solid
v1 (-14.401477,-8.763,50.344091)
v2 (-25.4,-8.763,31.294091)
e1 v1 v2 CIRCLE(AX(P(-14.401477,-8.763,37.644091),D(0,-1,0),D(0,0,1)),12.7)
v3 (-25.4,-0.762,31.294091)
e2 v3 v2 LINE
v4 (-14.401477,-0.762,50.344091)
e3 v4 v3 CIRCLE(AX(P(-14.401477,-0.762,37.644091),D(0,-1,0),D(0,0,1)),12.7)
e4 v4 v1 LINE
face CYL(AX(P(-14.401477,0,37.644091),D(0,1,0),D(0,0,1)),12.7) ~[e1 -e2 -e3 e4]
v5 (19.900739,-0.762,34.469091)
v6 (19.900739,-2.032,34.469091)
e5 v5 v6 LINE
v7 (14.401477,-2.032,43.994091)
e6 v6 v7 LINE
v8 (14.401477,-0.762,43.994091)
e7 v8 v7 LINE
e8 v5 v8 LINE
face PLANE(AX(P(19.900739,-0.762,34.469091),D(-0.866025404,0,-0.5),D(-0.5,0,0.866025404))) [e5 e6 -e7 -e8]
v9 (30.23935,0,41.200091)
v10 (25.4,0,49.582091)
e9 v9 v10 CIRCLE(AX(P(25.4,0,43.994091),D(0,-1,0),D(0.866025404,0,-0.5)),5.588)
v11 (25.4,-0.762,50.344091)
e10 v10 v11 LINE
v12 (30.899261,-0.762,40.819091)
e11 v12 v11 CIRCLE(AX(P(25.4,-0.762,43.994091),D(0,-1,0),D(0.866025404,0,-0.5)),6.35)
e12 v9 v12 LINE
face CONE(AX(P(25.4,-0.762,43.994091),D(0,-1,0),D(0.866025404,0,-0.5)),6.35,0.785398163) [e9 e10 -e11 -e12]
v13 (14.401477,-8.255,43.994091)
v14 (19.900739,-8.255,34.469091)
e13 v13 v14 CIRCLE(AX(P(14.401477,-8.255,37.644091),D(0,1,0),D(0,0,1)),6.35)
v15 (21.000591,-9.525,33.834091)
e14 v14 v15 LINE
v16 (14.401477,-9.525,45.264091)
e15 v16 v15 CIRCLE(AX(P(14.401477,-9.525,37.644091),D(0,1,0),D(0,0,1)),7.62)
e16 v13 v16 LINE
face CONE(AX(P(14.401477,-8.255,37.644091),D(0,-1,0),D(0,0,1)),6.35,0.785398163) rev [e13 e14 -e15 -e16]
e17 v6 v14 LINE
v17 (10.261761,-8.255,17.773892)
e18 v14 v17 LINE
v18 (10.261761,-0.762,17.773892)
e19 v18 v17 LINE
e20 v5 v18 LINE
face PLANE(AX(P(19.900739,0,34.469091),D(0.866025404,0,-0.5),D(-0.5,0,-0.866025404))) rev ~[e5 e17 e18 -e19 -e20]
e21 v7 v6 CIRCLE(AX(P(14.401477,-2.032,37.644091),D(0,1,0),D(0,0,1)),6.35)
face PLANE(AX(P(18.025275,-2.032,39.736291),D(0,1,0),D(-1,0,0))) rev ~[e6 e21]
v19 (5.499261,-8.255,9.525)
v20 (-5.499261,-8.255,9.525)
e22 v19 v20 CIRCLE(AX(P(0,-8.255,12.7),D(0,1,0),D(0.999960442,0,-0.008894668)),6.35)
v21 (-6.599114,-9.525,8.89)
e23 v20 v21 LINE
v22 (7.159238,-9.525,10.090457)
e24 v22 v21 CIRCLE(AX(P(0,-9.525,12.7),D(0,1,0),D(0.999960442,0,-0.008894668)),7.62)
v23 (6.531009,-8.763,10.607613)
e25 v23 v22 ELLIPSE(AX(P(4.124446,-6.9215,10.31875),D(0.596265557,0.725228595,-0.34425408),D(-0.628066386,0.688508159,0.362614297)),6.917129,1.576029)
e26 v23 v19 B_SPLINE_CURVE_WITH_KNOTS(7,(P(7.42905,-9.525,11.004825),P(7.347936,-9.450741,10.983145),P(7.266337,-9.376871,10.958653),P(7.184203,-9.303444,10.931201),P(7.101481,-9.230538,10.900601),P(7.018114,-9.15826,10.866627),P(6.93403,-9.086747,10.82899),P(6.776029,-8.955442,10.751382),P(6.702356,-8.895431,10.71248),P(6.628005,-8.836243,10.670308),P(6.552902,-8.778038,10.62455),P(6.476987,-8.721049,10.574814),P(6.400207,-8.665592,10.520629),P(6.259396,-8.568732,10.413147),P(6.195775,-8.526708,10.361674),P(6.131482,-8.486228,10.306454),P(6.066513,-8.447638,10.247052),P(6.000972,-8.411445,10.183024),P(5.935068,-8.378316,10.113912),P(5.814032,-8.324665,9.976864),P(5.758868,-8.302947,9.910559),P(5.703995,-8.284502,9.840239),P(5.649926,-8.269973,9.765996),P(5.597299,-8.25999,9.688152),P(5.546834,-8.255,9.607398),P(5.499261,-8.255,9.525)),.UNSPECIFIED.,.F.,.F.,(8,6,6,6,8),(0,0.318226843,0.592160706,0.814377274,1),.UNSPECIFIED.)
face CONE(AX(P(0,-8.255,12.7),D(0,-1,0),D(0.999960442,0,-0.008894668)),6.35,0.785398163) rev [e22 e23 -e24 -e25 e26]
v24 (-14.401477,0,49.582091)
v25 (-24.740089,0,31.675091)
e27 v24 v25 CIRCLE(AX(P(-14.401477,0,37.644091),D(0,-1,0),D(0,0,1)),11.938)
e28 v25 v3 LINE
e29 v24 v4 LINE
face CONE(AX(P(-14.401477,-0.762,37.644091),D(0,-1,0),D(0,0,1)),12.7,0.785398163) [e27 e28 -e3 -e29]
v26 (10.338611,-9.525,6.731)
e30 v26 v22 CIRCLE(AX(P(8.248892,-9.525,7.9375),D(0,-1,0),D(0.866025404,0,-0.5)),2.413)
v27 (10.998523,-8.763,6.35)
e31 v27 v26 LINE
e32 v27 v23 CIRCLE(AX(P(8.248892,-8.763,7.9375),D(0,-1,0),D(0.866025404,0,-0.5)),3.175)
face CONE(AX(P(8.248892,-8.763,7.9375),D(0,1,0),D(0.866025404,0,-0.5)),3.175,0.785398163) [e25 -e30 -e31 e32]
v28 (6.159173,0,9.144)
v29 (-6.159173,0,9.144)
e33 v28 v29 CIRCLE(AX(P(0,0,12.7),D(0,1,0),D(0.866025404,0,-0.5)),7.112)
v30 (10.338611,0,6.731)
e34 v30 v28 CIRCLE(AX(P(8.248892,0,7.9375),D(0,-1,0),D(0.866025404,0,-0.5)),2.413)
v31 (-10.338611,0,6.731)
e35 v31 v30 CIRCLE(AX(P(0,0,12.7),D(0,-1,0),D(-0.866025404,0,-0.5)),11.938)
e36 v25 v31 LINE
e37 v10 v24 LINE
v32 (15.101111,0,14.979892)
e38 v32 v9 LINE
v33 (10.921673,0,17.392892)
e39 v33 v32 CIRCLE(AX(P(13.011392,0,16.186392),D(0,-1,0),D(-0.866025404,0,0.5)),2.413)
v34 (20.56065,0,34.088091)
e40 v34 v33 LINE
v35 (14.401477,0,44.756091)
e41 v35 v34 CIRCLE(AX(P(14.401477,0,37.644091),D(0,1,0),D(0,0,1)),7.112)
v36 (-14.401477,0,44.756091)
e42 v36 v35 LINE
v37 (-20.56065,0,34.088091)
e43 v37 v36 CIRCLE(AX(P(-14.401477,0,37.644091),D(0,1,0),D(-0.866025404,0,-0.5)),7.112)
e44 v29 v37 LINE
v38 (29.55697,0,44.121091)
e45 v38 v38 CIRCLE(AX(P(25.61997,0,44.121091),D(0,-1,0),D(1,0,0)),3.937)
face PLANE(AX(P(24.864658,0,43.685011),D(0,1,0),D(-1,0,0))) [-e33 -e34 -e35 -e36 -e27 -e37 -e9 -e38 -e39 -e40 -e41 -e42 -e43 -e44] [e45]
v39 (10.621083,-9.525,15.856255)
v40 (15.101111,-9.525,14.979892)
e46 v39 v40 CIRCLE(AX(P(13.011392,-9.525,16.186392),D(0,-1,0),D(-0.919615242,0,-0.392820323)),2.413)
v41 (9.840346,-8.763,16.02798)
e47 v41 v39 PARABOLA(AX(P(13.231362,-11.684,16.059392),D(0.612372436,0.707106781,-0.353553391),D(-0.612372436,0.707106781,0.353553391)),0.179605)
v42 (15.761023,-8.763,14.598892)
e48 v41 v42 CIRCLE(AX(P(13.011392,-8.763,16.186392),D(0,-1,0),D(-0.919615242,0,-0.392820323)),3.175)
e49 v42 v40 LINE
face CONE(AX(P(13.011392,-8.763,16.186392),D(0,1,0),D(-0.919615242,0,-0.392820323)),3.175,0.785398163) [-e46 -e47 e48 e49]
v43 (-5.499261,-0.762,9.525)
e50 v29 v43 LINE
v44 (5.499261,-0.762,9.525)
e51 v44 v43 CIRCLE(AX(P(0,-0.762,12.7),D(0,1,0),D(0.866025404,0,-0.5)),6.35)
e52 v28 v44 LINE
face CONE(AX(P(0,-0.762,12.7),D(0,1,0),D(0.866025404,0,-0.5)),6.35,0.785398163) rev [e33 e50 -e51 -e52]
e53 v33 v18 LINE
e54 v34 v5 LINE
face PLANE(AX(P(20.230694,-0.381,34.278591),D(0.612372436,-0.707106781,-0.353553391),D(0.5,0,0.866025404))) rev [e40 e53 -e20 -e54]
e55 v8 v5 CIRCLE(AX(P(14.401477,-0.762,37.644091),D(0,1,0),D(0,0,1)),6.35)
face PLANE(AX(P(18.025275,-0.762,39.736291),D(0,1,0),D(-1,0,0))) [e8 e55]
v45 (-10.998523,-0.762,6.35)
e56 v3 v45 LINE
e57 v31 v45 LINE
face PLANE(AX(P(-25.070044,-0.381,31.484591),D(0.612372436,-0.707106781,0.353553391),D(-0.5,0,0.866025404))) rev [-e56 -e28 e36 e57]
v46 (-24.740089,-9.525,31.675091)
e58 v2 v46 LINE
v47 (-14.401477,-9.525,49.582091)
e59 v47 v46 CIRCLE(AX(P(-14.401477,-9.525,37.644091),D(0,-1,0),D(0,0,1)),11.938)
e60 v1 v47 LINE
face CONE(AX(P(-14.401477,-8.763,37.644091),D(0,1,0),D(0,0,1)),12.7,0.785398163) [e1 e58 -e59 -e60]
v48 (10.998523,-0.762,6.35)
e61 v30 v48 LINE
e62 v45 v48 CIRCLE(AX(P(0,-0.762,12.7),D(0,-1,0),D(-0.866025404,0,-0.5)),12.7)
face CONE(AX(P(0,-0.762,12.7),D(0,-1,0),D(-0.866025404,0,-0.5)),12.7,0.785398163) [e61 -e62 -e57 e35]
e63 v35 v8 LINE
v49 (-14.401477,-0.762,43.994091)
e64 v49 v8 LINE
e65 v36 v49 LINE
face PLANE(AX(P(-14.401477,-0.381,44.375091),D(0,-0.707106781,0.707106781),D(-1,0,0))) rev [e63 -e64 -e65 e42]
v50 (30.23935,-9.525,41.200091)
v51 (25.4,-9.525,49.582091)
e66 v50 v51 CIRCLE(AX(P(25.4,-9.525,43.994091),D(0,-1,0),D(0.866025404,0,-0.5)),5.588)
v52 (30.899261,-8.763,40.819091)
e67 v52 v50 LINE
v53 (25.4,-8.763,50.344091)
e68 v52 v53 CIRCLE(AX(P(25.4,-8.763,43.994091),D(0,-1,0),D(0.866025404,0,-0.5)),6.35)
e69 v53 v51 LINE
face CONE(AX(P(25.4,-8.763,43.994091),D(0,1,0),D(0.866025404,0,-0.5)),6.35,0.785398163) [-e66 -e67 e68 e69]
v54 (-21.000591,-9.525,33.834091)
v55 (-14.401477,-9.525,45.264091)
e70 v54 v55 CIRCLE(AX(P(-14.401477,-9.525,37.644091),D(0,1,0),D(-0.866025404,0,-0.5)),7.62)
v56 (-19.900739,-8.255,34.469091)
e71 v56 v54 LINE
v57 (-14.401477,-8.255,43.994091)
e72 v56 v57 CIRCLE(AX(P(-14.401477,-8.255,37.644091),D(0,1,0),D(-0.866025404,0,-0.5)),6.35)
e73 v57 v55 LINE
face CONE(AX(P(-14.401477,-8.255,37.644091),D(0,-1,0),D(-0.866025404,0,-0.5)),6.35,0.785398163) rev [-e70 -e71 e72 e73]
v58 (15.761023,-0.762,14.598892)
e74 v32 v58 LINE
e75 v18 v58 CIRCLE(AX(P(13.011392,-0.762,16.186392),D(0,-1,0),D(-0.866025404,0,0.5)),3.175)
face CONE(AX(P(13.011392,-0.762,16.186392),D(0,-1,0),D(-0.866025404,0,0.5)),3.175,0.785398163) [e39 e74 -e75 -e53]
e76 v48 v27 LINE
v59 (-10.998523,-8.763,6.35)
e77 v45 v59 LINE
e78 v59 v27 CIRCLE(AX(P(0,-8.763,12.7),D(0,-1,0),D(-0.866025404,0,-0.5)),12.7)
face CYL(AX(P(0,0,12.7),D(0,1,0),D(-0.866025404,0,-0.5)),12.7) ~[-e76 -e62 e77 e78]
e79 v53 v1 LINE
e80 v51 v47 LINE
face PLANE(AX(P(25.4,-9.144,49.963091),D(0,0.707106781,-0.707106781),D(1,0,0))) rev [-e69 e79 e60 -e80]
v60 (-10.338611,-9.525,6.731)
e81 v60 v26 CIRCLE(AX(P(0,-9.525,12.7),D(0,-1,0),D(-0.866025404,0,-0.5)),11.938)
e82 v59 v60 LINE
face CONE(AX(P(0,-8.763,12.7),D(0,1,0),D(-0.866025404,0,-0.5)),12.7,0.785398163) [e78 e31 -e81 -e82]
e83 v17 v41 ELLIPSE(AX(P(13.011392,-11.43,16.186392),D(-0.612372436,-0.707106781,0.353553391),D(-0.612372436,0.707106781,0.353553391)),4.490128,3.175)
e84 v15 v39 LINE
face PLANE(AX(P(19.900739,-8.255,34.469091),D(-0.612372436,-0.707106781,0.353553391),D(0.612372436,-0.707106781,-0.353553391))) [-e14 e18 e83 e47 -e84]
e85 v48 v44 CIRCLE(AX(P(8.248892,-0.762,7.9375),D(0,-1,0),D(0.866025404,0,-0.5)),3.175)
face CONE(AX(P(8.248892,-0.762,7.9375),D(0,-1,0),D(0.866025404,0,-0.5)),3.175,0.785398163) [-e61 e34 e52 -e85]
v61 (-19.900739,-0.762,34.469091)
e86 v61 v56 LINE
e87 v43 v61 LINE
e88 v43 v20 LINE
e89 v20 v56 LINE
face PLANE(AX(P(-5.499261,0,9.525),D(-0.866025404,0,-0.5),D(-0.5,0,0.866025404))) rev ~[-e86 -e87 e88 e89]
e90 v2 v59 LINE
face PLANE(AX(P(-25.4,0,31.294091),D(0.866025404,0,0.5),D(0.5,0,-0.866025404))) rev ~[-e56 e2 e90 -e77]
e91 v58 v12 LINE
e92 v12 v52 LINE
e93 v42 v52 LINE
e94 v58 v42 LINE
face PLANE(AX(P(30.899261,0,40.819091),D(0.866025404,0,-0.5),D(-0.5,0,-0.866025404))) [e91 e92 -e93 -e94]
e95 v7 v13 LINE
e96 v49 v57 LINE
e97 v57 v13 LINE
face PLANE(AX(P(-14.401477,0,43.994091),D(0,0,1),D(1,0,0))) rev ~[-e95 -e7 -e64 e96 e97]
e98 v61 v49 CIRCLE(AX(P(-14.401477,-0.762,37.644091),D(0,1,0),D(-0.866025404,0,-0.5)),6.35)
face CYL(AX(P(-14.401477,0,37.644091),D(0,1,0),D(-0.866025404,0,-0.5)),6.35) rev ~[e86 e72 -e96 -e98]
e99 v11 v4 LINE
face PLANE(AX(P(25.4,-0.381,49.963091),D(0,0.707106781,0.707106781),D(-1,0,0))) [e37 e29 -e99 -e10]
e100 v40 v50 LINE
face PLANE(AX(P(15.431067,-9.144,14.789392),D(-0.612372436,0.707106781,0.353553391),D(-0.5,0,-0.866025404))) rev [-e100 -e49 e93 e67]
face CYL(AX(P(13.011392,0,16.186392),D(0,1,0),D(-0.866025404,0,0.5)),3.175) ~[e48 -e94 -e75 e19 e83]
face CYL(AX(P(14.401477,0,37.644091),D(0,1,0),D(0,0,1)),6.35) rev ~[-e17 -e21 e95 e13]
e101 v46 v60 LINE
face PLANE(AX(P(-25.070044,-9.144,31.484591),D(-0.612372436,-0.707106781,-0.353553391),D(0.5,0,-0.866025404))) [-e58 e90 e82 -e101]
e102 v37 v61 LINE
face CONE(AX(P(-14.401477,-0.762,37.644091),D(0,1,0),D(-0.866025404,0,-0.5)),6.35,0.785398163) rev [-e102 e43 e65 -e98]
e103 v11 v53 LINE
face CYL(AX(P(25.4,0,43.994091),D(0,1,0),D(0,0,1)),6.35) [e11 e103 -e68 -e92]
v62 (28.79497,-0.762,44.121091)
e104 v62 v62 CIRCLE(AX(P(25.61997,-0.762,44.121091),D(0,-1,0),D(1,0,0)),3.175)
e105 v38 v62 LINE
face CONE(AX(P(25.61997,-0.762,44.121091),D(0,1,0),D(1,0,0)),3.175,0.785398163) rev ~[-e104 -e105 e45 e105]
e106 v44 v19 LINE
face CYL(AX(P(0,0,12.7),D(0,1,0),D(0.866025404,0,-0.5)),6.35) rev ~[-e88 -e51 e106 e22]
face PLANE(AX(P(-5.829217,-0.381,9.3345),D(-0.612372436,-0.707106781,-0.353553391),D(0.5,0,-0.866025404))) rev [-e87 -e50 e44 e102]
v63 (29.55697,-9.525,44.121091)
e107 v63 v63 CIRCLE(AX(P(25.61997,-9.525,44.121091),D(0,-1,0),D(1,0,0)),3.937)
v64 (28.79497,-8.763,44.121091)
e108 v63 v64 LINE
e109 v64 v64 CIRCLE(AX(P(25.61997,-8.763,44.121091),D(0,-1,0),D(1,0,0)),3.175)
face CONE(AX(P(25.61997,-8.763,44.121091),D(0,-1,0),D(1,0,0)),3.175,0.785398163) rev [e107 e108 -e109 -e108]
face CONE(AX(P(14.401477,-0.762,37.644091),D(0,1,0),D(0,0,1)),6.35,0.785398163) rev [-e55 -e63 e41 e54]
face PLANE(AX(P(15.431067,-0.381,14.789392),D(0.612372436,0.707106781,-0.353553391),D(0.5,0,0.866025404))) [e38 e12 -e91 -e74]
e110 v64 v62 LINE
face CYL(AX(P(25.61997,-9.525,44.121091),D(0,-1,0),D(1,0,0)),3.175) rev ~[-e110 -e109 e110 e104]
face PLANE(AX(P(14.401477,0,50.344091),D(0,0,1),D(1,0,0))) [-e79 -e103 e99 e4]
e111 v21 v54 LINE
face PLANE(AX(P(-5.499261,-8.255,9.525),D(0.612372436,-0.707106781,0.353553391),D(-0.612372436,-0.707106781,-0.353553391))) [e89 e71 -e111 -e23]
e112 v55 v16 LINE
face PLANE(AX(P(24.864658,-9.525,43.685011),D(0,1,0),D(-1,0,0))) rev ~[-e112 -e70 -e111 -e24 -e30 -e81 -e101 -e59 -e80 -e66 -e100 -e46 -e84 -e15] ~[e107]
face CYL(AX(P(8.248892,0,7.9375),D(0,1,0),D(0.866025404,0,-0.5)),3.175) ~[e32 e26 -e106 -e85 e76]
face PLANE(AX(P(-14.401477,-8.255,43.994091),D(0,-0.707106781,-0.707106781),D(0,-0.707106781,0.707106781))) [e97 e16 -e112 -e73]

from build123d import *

# Parameters (mm, degrees)
F1_DEPTH     = 9.525
F3_T1_DEPTH  = 28.8029547439
F3_T3_DEPTH  = 22.5439921386
F3_T5_DEPTH  = 28.8029547439
F3_T8_ANGLE  = 120
F3_T10_ANGLE = 120
F3_T12_ANGLE = 149.490366343
F5_DEPTH     = 9.525
F6_SIZE      = 0.762
F8_R         = 3.175
F9_DEPTH     = 9.526
F10_SIZE     = 0.762
F12_DEPTH    = 1.27


# Not quite as in the source:
# - a fillet or chamfer that OpenCascade refuses, or shapes differently, is made with other operations: its cross-section is extruded or revolved along the edge and cut away or added
# - a feature of the source that left no trace in its solid (it failed there, or was rolled back) is left out
# - a feature names something its author has since deleted; it is built from what else it names


with BuildPart() as f1:
    # F0 (on Front) → F1 (new body)
    with BuildSketch(Plane.XZ):
        with BuildLine():
            Line((-14.4014773719, 43.9940905122), (14.4014773719, 43.9940905122))
            ThreePointArc((14.4014773719, 43.9940905122), (19.900738686, 40.8190905122), (19.900738686, 34.4690905122))
            Line((19.900738686, 34.4690905122), (10.261761314, 17.773891971))
            ThreePointArc((10.261761314, 17.773891971), (11.423891971, 13.436761314), (15.7610226281, 14.598891971))
            Line((15.7610226281, 14.598891971), (25.4, 31.2940905122))
            ThreePointArc((25.4, 31.2940905122), (25.4, 43.9940905122), (14.4014773719, 50.3440905122))
            Line((14.4014773719, 50.3440905122), (-14.4014773719, 50.3440905122))
            ThreePointArc((-14.4014773719, 50.3440905122), (-25.4, 43.9940905122), (-25.4, 31.2940905122))
            Line((-25.4, 31.2940905122), (-10.9985226281, 6.35))
            ThreePointArc((-10.9985226281, 6.35), (0, 0), (10.9985226281, 6.35))
            ThreePointArc((10.9985226281, 6.35), (9.836391971, 10.687130657), (5.499261314, 9.525))
            ThreePointArc((5.499261314, 9.525), (0, 6.35), (-5.499261314, 9.525))
            Line((-5.499261314, 9.525), (-19.900738686, 34.4690905122))
            ThreePointArc((-19.900738686, 34.4690905122), (-19.900738686, 40.8190905122), (-14.4014773719, 43.9940905122))
        make_face()
    extrude(amount=F1_DEPTH)

    # F3: chamfer of 1.27 on 6 edges, made by hand

    # F3_s2 → F3_t1 (cut)
    with BuildSketch(Plane.YZ.offset(-14.4014773719)):
        Polygon((-8.255, 43.9940905122), (-9.525, 45.2640905122), (-9.525, 43.9940905122), align=None)
    extrude(amount=F3_T1_DEPTH, mode=Mode.SUBTRACT)

    # F3_s4 → F3_t3 (cut)
    with BuildSketch(Plane(origin=(19.900738686, 0, 34.4690905122), x_dir=(0, 1, 0), z_dir=(-0.5, 0, -0.8660254038))):
        Polygon((-8.255, 0), (-9.525, 1.27), (-9.525, 0), align=None)
    extrude(amount=F3_T3_DEPTH, mode=Mode.SUBTRACT)

    # F3_s6 → F3_t5 (cut)
    with BuildSketch(Plane(origin=(-5.499261314, 0, 9.525), x_dir=(0, 1, 0), z_dir=(-0.5, 0, 0.8660254038))):
        Polygon((-8.255, 0), (-9.525, 1.27), (-9.525, 0), align=None)
    extrude(amount=F3_T5_DEPTH, mode=Mode.SUBTRACT)

    # F3_s7 → F3_t8 (revolve, cut)
    with BuildSketch(Plane(origin=(-19.900738686, 0, 34.4690905122), x_dir=(0, 1, 0), z_dir=(0.5, 0, -0.8660254038))):
        Polygon((-8.255, 0), (-9.525, -1.27), (-9.525, 0), align=None)
    revolve(axis=Axis((-14.4014773719, -9.525, 37.6440905122), (0, 1, 0)), revolution_arc=F3_T8_ANGLE, mode=Mode.SUBTRACT)

    # F3_s9 → F3_t10 (revolve, cut)
    with BuildSketch(Plane.YZ.offset(14.4014773719)):
        Polygon((-8.255, 43.9940905122), (-9.525, 45.2640905122), (-9.525, 43.9940905122), align=None)
    revolve(axis=Axis((14.4014773719, -9.525, 37.6440905122), (0, 1, 0)), revolution_arc=F3_T10_ANGLE, mode=Mode.SUBTRACT)

    # F3_s11 → F3_t12 (revolve, cut)
    with BuildSketch(Plane(origin=(0.1129578151, 0, 12.698995238), x_dir=(0, 1, 0), z_dir=(0.008894668, 0, 0.9999604417))):
        Polygon((-8.255, -6.2370377163), (-9.525, -7.5070377163), (-9.525, -6.2370377163), align=None)
    revolve(axis=Axis((0, -9.525, 12.7), (0, 1, 0)), revolution_arc=F3_T12_ANGLE, mode=Mode.SUBTRACT)

    # F4 (on face) → F5 (join, through all)
    with BuildSketch(Plane(origin=(0, 0, 0), x_dir=(-1, 0, 0), z_dir=(0, 1, 0))):
        with BuildLine():
            Line((-30.899261314, 40.8190905122), (-25.4, 31.2940905122))
            ThreePointArc((-25.4, 31.2940905122), (-25.4, 43.9940905122), (-14.4014773719, 50.3440905122))
            Line((-14.4014773719, 50.3440905122), (-25.4, 50.3440905122))
            ThreePointArc((-25.4, 50.3440905122), (-30.899261314, 47.1690905122), (-30.899261314, 40.8190905122))
        make_face()
    extrude(amount=-F5_DEPTH)

    # F6
    f6_edges = [f1.edges().sort_by_distance(p)[0] for p in [
        (12.821161, -9.525, 13.017096),
        (23.330142, -9.525, 27.708991),
        (30.899261, -9.525, 47.169091),
        (5.499261, -9.525, 50.344091),
        (-25.4, -9.525, 43.994091),
        (-18.199261, -9.525, 18.822045),
        (0, -9.525, 0),
        (10.76839, -9.525, 9.869534),
        (9.836392, 0, 10.687131),
        (0, 0, 0),
        (-18.199261, 0, 18.822045),
        (-25.4, 0, 43.994091),
        (5.499261, 0, 50.344091),
        (30.899261, 0, 47.169091),
        (23.330142, 0, 27.708991),
        (11.423892, 0, 13.436761),
        (15.08125, 0, 26.121491),
        (19.900739, 0, 40.819091),
        (0, 0, 43.994091),
        (-19.900739, 0, 40.819091),
        (-12.7, 0, 21.997045),
        (0, 0, 6.35),
    ]]
    chamfer(f6_edges, length=F6_SIZE)

    # F8 (on face) → F9 (cut, through all)
    with BuildSketch(Plane.XZ.offset(9.525)):
        with Locations((25.6199704526, 44.1210905122)):
            Circle(F8_R)
    extrude(amount=-F9_DEPTH, mode=Mode.SUBTRACT)

    # F10
    f10_edges = [f1.edges().sort_by_distance(p)[0] for p in [
        (22.44497, -9.525, 44.121091),
        (28.79497, -4.7625, 44.121091),
        (22.44497, 0, 44.121091),
    ]]
    chamfer(f10_edges, length=F10_SIZE)

    # F11 (on offset) → F12 (join)
    with BuildSketch(Plane(origin=(0, -0.762, 0), x_dir=(-1, 0, 0), z_dir=(0, 1, 0))):
        with BuildLine():
            Line((-19.900738686, 34.4690905122), (-14.4014773719, 43.9940905122))
            ThreePointArc((-14.4014773719, 43.9940905122), (-19.900738686, 40.8190905122), (-19.900738686, 34.4690905122))
        make_face()
    extrude(amount=-F12_DEPTH)


solid = f1.part
